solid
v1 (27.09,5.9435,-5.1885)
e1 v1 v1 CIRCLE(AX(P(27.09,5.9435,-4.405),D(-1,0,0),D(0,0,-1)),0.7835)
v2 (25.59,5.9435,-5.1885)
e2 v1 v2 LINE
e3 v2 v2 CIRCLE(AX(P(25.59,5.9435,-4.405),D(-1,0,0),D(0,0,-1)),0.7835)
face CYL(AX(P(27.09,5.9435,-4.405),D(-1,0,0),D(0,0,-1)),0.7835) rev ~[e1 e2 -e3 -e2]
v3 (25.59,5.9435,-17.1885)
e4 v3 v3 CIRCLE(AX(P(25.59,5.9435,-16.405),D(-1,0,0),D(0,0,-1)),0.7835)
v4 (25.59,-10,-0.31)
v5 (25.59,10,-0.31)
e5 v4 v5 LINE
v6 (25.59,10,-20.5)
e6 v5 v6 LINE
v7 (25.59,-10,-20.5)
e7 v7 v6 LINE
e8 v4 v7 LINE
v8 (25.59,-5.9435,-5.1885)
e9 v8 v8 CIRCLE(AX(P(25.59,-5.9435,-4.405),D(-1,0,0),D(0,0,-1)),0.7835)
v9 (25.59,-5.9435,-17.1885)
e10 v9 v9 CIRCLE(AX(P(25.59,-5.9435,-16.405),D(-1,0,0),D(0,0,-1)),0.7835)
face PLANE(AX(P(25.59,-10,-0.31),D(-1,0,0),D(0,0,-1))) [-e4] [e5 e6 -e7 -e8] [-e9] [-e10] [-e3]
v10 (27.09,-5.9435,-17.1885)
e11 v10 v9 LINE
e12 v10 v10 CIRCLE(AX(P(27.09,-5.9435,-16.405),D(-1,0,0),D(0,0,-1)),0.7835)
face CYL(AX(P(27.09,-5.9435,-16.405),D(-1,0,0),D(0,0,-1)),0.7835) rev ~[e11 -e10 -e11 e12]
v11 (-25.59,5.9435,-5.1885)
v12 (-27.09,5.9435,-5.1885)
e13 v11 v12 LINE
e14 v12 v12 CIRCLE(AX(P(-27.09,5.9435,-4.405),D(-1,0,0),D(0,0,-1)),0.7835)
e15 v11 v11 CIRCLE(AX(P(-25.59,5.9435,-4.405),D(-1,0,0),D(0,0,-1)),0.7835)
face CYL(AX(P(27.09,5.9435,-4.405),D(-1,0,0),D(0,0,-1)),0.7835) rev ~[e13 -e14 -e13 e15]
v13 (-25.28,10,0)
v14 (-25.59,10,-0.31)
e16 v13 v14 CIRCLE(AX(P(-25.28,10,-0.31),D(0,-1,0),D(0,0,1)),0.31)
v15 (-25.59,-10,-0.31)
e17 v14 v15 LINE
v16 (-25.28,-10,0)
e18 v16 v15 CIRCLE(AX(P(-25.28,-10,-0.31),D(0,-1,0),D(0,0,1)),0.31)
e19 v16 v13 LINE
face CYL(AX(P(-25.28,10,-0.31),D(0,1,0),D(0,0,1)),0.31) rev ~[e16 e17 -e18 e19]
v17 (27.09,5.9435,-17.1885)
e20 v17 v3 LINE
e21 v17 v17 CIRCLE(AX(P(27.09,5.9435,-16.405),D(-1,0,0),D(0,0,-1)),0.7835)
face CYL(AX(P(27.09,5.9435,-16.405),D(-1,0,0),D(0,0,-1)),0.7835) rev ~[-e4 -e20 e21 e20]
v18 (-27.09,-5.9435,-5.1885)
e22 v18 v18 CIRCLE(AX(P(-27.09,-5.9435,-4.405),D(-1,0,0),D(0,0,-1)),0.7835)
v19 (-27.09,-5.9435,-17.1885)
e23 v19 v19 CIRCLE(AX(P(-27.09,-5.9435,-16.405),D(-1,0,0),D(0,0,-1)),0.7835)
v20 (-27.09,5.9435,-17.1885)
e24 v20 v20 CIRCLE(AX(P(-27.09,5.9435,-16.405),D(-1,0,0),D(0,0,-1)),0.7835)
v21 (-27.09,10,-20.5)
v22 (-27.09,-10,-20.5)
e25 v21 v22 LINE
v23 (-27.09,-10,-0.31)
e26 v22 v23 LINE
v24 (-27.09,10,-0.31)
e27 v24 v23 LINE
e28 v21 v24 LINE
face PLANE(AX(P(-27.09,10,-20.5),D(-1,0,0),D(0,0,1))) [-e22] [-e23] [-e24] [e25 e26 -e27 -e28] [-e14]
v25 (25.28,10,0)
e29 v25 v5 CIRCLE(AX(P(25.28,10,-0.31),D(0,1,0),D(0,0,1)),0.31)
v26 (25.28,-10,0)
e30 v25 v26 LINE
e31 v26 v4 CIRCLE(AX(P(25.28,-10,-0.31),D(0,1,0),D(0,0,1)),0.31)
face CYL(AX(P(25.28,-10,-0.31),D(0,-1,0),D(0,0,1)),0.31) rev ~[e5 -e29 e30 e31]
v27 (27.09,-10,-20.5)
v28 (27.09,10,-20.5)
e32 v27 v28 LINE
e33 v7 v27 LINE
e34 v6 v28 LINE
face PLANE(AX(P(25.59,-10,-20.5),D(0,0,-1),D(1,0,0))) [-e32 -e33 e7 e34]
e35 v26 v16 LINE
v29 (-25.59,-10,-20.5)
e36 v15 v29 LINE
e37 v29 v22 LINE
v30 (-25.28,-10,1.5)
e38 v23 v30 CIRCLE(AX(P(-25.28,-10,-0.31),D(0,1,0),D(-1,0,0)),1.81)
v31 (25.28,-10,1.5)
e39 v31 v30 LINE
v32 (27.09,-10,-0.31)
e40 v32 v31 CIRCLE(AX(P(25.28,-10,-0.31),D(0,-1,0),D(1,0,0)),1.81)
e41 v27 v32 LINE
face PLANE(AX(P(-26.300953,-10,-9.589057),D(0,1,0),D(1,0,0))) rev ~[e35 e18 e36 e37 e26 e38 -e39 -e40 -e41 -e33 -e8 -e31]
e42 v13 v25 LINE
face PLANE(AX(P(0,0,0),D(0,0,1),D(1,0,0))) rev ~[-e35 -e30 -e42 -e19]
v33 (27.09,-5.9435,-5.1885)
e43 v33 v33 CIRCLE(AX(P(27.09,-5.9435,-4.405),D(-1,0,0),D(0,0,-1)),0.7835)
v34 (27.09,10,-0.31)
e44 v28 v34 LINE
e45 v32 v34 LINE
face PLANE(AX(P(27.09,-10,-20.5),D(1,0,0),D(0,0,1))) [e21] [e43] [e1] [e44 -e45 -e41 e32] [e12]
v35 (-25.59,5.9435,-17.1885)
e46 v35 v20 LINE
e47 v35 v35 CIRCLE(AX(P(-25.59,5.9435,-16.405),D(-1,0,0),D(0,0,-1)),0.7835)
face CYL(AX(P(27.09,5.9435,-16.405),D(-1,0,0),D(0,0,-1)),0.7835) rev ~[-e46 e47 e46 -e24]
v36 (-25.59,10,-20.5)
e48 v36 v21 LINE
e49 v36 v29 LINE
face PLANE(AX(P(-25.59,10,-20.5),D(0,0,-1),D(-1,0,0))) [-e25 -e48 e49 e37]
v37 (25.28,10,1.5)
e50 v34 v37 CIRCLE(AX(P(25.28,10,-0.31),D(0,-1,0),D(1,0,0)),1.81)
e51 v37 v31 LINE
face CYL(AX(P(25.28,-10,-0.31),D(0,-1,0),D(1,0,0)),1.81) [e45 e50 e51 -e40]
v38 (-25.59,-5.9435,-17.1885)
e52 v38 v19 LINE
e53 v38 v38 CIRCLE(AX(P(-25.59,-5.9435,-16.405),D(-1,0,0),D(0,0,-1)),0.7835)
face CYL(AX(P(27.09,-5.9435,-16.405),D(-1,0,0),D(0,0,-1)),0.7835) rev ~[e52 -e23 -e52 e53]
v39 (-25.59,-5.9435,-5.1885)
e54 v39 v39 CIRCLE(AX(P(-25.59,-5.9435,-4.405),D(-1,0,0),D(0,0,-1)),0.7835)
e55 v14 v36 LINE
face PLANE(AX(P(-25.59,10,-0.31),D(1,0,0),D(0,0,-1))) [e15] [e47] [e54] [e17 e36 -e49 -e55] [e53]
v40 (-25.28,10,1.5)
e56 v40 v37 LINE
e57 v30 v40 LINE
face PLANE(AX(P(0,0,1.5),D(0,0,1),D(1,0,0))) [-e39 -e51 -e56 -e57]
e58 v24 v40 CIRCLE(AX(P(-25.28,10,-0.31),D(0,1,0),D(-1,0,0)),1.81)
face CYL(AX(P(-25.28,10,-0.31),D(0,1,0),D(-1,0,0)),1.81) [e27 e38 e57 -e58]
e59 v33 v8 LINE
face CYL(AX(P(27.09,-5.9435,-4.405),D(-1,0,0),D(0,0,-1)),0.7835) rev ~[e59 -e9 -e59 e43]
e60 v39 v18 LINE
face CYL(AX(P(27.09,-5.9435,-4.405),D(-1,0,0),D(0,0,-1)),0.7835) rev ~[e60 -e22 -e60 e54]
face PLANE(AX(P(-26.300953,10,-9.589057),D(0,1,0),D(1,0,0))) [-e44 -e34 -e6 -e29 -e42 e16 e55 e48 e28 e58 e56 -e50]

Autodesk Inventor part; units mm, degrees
ref_plane "YZ Plane" through (0, 0, 0) normal (1, 0, 0) x (0, 1, 0)
ref_plane "XZ Plane" through (0, 0, 0) normal (0, 1, 0) x (-1, 0, 0)
ref_plane "XY Plane" through (0, 0, 0) normal (0, 0, 1) x (1, 0, 0)
sketch "Sketch1" plane through (0, 0, 0) normal (0, 0, 1) x (1, 0, 0)
  line L0 (27.09, -10) -> (-27.09, -10)
  line L1 (-27.09, -10) -> (-27.09, 10)
  line L2 (-27.09, 10) -> (27.09, 10)
  line L3 (27.09, 10) -> (27.09, -10)
  line L4 (27.09, -10) -> (-27.09, 10) construction
  line L5 (-27.09, -10) -> (27.09, 10) construction
  point P0 (0, 0)
  dimension "d0" = 54.18
  dimension "d1" = 20
extrude "Plate1" add sketch "Sketch1" along normal blind 1.5
sketch "Sketch2" plane through (-25.59, 10, 1.5) normal (-1, 0, 0) x (0, -1, 0)
  line L0 (20, 0) -> (0, 0)
  line L1 (0, 0) -> (0, -22)
  line L2 (0, -22) -> (20, -22)
  line L3 (20, -22) -> (20, 0)
edge flange "Flange1" height 22 angle 90 thickness 1.5 bend radius 0.31 thickness toward (-1, 0, 0) relief tear relief width 1.5 relief depth 0.75 corner gap 0.31 corner form 0 edges at (-27.09, 0, 0) (27.09, 0, 0) wall of the first edge with corners at (-25.59, -10, 1.5) (-25.59, 10, 1.5) (-25.59, 10, -20.5) (-25.59, -10, -20.5)
bend "Bend1"
corner "Corner1"
sketch "Sketch3" plane through (27.09, -10, -20.5) normal (1, 0, 0) x (0, 0, -1)
  line L0 (-20.19, 20) -> (-20.19, 0) construction
  line L1 (0, 0) -> (-20.19, 0) construction
  line L2 (0, 20) -> (0, 0) construction
  line L3 (-20.19, 20) -> (0, 20) construction
  line L4 (0, 20) -> (-20.19, 0) construction
  line L5 (0, 0) -> (-20.19, 20) construction
  point P0 (-20.5, 10)
  point P1 (-16.095, 15.9435)
  point P2 (-4.095, 15.9435)
  point P3 (-16.095, 4.0565)
  point P4 (-4.095, 4.0565)
  dimension "d13" = 12
hole "Hole1" at (27.09, 5.9435, -4.405) at (27.09, 5.9435, -16.405) at (27.09, -5.9435, -4.405) at (27.09, -5.9435, -16.405) direction (-1, 0, 0) diameter 1.567 end through all thread size "M2x0.4" class "6H" standard "ISO Metric profile"
equation "\"d2\" = Thickness"
equation "\"d3\" = BendReliefWidth"
equation "\"d4\" = BendReliefDepth"
equation "\"d5\" = MinimumRemnant"
equation "\"d6\" = TransitionRadius"
equation "\"d9\" = BendRadius"
equation "\"d10\" = CornerReliefSize"
equation "\"d11\" = GapSize"
equation "\"d12\" = JacobiRadiusSize"
equation "\"BendReliefWidth\" = Thickness"
equation "\"BendReliefDepth\" = 0.5 * Thickness"
equation "\"CornerReliefSize\" = 4 * Thickness"
equation "\"MinimumRemnant\" = 2 * Thickness"
equation "\"TransitionRadius\" = BendRadius"
equation "\"JacobiRadiusSize\" = BendRadius"
equation "\"GapSize\" = Thickness"
equation "\"Thickness\" = 1.5"
equation "\"BendRadius\" = 0.31"
properties part number "axis_3_bottom_frame(middle)" material "Aluminum 6061-AHC"
